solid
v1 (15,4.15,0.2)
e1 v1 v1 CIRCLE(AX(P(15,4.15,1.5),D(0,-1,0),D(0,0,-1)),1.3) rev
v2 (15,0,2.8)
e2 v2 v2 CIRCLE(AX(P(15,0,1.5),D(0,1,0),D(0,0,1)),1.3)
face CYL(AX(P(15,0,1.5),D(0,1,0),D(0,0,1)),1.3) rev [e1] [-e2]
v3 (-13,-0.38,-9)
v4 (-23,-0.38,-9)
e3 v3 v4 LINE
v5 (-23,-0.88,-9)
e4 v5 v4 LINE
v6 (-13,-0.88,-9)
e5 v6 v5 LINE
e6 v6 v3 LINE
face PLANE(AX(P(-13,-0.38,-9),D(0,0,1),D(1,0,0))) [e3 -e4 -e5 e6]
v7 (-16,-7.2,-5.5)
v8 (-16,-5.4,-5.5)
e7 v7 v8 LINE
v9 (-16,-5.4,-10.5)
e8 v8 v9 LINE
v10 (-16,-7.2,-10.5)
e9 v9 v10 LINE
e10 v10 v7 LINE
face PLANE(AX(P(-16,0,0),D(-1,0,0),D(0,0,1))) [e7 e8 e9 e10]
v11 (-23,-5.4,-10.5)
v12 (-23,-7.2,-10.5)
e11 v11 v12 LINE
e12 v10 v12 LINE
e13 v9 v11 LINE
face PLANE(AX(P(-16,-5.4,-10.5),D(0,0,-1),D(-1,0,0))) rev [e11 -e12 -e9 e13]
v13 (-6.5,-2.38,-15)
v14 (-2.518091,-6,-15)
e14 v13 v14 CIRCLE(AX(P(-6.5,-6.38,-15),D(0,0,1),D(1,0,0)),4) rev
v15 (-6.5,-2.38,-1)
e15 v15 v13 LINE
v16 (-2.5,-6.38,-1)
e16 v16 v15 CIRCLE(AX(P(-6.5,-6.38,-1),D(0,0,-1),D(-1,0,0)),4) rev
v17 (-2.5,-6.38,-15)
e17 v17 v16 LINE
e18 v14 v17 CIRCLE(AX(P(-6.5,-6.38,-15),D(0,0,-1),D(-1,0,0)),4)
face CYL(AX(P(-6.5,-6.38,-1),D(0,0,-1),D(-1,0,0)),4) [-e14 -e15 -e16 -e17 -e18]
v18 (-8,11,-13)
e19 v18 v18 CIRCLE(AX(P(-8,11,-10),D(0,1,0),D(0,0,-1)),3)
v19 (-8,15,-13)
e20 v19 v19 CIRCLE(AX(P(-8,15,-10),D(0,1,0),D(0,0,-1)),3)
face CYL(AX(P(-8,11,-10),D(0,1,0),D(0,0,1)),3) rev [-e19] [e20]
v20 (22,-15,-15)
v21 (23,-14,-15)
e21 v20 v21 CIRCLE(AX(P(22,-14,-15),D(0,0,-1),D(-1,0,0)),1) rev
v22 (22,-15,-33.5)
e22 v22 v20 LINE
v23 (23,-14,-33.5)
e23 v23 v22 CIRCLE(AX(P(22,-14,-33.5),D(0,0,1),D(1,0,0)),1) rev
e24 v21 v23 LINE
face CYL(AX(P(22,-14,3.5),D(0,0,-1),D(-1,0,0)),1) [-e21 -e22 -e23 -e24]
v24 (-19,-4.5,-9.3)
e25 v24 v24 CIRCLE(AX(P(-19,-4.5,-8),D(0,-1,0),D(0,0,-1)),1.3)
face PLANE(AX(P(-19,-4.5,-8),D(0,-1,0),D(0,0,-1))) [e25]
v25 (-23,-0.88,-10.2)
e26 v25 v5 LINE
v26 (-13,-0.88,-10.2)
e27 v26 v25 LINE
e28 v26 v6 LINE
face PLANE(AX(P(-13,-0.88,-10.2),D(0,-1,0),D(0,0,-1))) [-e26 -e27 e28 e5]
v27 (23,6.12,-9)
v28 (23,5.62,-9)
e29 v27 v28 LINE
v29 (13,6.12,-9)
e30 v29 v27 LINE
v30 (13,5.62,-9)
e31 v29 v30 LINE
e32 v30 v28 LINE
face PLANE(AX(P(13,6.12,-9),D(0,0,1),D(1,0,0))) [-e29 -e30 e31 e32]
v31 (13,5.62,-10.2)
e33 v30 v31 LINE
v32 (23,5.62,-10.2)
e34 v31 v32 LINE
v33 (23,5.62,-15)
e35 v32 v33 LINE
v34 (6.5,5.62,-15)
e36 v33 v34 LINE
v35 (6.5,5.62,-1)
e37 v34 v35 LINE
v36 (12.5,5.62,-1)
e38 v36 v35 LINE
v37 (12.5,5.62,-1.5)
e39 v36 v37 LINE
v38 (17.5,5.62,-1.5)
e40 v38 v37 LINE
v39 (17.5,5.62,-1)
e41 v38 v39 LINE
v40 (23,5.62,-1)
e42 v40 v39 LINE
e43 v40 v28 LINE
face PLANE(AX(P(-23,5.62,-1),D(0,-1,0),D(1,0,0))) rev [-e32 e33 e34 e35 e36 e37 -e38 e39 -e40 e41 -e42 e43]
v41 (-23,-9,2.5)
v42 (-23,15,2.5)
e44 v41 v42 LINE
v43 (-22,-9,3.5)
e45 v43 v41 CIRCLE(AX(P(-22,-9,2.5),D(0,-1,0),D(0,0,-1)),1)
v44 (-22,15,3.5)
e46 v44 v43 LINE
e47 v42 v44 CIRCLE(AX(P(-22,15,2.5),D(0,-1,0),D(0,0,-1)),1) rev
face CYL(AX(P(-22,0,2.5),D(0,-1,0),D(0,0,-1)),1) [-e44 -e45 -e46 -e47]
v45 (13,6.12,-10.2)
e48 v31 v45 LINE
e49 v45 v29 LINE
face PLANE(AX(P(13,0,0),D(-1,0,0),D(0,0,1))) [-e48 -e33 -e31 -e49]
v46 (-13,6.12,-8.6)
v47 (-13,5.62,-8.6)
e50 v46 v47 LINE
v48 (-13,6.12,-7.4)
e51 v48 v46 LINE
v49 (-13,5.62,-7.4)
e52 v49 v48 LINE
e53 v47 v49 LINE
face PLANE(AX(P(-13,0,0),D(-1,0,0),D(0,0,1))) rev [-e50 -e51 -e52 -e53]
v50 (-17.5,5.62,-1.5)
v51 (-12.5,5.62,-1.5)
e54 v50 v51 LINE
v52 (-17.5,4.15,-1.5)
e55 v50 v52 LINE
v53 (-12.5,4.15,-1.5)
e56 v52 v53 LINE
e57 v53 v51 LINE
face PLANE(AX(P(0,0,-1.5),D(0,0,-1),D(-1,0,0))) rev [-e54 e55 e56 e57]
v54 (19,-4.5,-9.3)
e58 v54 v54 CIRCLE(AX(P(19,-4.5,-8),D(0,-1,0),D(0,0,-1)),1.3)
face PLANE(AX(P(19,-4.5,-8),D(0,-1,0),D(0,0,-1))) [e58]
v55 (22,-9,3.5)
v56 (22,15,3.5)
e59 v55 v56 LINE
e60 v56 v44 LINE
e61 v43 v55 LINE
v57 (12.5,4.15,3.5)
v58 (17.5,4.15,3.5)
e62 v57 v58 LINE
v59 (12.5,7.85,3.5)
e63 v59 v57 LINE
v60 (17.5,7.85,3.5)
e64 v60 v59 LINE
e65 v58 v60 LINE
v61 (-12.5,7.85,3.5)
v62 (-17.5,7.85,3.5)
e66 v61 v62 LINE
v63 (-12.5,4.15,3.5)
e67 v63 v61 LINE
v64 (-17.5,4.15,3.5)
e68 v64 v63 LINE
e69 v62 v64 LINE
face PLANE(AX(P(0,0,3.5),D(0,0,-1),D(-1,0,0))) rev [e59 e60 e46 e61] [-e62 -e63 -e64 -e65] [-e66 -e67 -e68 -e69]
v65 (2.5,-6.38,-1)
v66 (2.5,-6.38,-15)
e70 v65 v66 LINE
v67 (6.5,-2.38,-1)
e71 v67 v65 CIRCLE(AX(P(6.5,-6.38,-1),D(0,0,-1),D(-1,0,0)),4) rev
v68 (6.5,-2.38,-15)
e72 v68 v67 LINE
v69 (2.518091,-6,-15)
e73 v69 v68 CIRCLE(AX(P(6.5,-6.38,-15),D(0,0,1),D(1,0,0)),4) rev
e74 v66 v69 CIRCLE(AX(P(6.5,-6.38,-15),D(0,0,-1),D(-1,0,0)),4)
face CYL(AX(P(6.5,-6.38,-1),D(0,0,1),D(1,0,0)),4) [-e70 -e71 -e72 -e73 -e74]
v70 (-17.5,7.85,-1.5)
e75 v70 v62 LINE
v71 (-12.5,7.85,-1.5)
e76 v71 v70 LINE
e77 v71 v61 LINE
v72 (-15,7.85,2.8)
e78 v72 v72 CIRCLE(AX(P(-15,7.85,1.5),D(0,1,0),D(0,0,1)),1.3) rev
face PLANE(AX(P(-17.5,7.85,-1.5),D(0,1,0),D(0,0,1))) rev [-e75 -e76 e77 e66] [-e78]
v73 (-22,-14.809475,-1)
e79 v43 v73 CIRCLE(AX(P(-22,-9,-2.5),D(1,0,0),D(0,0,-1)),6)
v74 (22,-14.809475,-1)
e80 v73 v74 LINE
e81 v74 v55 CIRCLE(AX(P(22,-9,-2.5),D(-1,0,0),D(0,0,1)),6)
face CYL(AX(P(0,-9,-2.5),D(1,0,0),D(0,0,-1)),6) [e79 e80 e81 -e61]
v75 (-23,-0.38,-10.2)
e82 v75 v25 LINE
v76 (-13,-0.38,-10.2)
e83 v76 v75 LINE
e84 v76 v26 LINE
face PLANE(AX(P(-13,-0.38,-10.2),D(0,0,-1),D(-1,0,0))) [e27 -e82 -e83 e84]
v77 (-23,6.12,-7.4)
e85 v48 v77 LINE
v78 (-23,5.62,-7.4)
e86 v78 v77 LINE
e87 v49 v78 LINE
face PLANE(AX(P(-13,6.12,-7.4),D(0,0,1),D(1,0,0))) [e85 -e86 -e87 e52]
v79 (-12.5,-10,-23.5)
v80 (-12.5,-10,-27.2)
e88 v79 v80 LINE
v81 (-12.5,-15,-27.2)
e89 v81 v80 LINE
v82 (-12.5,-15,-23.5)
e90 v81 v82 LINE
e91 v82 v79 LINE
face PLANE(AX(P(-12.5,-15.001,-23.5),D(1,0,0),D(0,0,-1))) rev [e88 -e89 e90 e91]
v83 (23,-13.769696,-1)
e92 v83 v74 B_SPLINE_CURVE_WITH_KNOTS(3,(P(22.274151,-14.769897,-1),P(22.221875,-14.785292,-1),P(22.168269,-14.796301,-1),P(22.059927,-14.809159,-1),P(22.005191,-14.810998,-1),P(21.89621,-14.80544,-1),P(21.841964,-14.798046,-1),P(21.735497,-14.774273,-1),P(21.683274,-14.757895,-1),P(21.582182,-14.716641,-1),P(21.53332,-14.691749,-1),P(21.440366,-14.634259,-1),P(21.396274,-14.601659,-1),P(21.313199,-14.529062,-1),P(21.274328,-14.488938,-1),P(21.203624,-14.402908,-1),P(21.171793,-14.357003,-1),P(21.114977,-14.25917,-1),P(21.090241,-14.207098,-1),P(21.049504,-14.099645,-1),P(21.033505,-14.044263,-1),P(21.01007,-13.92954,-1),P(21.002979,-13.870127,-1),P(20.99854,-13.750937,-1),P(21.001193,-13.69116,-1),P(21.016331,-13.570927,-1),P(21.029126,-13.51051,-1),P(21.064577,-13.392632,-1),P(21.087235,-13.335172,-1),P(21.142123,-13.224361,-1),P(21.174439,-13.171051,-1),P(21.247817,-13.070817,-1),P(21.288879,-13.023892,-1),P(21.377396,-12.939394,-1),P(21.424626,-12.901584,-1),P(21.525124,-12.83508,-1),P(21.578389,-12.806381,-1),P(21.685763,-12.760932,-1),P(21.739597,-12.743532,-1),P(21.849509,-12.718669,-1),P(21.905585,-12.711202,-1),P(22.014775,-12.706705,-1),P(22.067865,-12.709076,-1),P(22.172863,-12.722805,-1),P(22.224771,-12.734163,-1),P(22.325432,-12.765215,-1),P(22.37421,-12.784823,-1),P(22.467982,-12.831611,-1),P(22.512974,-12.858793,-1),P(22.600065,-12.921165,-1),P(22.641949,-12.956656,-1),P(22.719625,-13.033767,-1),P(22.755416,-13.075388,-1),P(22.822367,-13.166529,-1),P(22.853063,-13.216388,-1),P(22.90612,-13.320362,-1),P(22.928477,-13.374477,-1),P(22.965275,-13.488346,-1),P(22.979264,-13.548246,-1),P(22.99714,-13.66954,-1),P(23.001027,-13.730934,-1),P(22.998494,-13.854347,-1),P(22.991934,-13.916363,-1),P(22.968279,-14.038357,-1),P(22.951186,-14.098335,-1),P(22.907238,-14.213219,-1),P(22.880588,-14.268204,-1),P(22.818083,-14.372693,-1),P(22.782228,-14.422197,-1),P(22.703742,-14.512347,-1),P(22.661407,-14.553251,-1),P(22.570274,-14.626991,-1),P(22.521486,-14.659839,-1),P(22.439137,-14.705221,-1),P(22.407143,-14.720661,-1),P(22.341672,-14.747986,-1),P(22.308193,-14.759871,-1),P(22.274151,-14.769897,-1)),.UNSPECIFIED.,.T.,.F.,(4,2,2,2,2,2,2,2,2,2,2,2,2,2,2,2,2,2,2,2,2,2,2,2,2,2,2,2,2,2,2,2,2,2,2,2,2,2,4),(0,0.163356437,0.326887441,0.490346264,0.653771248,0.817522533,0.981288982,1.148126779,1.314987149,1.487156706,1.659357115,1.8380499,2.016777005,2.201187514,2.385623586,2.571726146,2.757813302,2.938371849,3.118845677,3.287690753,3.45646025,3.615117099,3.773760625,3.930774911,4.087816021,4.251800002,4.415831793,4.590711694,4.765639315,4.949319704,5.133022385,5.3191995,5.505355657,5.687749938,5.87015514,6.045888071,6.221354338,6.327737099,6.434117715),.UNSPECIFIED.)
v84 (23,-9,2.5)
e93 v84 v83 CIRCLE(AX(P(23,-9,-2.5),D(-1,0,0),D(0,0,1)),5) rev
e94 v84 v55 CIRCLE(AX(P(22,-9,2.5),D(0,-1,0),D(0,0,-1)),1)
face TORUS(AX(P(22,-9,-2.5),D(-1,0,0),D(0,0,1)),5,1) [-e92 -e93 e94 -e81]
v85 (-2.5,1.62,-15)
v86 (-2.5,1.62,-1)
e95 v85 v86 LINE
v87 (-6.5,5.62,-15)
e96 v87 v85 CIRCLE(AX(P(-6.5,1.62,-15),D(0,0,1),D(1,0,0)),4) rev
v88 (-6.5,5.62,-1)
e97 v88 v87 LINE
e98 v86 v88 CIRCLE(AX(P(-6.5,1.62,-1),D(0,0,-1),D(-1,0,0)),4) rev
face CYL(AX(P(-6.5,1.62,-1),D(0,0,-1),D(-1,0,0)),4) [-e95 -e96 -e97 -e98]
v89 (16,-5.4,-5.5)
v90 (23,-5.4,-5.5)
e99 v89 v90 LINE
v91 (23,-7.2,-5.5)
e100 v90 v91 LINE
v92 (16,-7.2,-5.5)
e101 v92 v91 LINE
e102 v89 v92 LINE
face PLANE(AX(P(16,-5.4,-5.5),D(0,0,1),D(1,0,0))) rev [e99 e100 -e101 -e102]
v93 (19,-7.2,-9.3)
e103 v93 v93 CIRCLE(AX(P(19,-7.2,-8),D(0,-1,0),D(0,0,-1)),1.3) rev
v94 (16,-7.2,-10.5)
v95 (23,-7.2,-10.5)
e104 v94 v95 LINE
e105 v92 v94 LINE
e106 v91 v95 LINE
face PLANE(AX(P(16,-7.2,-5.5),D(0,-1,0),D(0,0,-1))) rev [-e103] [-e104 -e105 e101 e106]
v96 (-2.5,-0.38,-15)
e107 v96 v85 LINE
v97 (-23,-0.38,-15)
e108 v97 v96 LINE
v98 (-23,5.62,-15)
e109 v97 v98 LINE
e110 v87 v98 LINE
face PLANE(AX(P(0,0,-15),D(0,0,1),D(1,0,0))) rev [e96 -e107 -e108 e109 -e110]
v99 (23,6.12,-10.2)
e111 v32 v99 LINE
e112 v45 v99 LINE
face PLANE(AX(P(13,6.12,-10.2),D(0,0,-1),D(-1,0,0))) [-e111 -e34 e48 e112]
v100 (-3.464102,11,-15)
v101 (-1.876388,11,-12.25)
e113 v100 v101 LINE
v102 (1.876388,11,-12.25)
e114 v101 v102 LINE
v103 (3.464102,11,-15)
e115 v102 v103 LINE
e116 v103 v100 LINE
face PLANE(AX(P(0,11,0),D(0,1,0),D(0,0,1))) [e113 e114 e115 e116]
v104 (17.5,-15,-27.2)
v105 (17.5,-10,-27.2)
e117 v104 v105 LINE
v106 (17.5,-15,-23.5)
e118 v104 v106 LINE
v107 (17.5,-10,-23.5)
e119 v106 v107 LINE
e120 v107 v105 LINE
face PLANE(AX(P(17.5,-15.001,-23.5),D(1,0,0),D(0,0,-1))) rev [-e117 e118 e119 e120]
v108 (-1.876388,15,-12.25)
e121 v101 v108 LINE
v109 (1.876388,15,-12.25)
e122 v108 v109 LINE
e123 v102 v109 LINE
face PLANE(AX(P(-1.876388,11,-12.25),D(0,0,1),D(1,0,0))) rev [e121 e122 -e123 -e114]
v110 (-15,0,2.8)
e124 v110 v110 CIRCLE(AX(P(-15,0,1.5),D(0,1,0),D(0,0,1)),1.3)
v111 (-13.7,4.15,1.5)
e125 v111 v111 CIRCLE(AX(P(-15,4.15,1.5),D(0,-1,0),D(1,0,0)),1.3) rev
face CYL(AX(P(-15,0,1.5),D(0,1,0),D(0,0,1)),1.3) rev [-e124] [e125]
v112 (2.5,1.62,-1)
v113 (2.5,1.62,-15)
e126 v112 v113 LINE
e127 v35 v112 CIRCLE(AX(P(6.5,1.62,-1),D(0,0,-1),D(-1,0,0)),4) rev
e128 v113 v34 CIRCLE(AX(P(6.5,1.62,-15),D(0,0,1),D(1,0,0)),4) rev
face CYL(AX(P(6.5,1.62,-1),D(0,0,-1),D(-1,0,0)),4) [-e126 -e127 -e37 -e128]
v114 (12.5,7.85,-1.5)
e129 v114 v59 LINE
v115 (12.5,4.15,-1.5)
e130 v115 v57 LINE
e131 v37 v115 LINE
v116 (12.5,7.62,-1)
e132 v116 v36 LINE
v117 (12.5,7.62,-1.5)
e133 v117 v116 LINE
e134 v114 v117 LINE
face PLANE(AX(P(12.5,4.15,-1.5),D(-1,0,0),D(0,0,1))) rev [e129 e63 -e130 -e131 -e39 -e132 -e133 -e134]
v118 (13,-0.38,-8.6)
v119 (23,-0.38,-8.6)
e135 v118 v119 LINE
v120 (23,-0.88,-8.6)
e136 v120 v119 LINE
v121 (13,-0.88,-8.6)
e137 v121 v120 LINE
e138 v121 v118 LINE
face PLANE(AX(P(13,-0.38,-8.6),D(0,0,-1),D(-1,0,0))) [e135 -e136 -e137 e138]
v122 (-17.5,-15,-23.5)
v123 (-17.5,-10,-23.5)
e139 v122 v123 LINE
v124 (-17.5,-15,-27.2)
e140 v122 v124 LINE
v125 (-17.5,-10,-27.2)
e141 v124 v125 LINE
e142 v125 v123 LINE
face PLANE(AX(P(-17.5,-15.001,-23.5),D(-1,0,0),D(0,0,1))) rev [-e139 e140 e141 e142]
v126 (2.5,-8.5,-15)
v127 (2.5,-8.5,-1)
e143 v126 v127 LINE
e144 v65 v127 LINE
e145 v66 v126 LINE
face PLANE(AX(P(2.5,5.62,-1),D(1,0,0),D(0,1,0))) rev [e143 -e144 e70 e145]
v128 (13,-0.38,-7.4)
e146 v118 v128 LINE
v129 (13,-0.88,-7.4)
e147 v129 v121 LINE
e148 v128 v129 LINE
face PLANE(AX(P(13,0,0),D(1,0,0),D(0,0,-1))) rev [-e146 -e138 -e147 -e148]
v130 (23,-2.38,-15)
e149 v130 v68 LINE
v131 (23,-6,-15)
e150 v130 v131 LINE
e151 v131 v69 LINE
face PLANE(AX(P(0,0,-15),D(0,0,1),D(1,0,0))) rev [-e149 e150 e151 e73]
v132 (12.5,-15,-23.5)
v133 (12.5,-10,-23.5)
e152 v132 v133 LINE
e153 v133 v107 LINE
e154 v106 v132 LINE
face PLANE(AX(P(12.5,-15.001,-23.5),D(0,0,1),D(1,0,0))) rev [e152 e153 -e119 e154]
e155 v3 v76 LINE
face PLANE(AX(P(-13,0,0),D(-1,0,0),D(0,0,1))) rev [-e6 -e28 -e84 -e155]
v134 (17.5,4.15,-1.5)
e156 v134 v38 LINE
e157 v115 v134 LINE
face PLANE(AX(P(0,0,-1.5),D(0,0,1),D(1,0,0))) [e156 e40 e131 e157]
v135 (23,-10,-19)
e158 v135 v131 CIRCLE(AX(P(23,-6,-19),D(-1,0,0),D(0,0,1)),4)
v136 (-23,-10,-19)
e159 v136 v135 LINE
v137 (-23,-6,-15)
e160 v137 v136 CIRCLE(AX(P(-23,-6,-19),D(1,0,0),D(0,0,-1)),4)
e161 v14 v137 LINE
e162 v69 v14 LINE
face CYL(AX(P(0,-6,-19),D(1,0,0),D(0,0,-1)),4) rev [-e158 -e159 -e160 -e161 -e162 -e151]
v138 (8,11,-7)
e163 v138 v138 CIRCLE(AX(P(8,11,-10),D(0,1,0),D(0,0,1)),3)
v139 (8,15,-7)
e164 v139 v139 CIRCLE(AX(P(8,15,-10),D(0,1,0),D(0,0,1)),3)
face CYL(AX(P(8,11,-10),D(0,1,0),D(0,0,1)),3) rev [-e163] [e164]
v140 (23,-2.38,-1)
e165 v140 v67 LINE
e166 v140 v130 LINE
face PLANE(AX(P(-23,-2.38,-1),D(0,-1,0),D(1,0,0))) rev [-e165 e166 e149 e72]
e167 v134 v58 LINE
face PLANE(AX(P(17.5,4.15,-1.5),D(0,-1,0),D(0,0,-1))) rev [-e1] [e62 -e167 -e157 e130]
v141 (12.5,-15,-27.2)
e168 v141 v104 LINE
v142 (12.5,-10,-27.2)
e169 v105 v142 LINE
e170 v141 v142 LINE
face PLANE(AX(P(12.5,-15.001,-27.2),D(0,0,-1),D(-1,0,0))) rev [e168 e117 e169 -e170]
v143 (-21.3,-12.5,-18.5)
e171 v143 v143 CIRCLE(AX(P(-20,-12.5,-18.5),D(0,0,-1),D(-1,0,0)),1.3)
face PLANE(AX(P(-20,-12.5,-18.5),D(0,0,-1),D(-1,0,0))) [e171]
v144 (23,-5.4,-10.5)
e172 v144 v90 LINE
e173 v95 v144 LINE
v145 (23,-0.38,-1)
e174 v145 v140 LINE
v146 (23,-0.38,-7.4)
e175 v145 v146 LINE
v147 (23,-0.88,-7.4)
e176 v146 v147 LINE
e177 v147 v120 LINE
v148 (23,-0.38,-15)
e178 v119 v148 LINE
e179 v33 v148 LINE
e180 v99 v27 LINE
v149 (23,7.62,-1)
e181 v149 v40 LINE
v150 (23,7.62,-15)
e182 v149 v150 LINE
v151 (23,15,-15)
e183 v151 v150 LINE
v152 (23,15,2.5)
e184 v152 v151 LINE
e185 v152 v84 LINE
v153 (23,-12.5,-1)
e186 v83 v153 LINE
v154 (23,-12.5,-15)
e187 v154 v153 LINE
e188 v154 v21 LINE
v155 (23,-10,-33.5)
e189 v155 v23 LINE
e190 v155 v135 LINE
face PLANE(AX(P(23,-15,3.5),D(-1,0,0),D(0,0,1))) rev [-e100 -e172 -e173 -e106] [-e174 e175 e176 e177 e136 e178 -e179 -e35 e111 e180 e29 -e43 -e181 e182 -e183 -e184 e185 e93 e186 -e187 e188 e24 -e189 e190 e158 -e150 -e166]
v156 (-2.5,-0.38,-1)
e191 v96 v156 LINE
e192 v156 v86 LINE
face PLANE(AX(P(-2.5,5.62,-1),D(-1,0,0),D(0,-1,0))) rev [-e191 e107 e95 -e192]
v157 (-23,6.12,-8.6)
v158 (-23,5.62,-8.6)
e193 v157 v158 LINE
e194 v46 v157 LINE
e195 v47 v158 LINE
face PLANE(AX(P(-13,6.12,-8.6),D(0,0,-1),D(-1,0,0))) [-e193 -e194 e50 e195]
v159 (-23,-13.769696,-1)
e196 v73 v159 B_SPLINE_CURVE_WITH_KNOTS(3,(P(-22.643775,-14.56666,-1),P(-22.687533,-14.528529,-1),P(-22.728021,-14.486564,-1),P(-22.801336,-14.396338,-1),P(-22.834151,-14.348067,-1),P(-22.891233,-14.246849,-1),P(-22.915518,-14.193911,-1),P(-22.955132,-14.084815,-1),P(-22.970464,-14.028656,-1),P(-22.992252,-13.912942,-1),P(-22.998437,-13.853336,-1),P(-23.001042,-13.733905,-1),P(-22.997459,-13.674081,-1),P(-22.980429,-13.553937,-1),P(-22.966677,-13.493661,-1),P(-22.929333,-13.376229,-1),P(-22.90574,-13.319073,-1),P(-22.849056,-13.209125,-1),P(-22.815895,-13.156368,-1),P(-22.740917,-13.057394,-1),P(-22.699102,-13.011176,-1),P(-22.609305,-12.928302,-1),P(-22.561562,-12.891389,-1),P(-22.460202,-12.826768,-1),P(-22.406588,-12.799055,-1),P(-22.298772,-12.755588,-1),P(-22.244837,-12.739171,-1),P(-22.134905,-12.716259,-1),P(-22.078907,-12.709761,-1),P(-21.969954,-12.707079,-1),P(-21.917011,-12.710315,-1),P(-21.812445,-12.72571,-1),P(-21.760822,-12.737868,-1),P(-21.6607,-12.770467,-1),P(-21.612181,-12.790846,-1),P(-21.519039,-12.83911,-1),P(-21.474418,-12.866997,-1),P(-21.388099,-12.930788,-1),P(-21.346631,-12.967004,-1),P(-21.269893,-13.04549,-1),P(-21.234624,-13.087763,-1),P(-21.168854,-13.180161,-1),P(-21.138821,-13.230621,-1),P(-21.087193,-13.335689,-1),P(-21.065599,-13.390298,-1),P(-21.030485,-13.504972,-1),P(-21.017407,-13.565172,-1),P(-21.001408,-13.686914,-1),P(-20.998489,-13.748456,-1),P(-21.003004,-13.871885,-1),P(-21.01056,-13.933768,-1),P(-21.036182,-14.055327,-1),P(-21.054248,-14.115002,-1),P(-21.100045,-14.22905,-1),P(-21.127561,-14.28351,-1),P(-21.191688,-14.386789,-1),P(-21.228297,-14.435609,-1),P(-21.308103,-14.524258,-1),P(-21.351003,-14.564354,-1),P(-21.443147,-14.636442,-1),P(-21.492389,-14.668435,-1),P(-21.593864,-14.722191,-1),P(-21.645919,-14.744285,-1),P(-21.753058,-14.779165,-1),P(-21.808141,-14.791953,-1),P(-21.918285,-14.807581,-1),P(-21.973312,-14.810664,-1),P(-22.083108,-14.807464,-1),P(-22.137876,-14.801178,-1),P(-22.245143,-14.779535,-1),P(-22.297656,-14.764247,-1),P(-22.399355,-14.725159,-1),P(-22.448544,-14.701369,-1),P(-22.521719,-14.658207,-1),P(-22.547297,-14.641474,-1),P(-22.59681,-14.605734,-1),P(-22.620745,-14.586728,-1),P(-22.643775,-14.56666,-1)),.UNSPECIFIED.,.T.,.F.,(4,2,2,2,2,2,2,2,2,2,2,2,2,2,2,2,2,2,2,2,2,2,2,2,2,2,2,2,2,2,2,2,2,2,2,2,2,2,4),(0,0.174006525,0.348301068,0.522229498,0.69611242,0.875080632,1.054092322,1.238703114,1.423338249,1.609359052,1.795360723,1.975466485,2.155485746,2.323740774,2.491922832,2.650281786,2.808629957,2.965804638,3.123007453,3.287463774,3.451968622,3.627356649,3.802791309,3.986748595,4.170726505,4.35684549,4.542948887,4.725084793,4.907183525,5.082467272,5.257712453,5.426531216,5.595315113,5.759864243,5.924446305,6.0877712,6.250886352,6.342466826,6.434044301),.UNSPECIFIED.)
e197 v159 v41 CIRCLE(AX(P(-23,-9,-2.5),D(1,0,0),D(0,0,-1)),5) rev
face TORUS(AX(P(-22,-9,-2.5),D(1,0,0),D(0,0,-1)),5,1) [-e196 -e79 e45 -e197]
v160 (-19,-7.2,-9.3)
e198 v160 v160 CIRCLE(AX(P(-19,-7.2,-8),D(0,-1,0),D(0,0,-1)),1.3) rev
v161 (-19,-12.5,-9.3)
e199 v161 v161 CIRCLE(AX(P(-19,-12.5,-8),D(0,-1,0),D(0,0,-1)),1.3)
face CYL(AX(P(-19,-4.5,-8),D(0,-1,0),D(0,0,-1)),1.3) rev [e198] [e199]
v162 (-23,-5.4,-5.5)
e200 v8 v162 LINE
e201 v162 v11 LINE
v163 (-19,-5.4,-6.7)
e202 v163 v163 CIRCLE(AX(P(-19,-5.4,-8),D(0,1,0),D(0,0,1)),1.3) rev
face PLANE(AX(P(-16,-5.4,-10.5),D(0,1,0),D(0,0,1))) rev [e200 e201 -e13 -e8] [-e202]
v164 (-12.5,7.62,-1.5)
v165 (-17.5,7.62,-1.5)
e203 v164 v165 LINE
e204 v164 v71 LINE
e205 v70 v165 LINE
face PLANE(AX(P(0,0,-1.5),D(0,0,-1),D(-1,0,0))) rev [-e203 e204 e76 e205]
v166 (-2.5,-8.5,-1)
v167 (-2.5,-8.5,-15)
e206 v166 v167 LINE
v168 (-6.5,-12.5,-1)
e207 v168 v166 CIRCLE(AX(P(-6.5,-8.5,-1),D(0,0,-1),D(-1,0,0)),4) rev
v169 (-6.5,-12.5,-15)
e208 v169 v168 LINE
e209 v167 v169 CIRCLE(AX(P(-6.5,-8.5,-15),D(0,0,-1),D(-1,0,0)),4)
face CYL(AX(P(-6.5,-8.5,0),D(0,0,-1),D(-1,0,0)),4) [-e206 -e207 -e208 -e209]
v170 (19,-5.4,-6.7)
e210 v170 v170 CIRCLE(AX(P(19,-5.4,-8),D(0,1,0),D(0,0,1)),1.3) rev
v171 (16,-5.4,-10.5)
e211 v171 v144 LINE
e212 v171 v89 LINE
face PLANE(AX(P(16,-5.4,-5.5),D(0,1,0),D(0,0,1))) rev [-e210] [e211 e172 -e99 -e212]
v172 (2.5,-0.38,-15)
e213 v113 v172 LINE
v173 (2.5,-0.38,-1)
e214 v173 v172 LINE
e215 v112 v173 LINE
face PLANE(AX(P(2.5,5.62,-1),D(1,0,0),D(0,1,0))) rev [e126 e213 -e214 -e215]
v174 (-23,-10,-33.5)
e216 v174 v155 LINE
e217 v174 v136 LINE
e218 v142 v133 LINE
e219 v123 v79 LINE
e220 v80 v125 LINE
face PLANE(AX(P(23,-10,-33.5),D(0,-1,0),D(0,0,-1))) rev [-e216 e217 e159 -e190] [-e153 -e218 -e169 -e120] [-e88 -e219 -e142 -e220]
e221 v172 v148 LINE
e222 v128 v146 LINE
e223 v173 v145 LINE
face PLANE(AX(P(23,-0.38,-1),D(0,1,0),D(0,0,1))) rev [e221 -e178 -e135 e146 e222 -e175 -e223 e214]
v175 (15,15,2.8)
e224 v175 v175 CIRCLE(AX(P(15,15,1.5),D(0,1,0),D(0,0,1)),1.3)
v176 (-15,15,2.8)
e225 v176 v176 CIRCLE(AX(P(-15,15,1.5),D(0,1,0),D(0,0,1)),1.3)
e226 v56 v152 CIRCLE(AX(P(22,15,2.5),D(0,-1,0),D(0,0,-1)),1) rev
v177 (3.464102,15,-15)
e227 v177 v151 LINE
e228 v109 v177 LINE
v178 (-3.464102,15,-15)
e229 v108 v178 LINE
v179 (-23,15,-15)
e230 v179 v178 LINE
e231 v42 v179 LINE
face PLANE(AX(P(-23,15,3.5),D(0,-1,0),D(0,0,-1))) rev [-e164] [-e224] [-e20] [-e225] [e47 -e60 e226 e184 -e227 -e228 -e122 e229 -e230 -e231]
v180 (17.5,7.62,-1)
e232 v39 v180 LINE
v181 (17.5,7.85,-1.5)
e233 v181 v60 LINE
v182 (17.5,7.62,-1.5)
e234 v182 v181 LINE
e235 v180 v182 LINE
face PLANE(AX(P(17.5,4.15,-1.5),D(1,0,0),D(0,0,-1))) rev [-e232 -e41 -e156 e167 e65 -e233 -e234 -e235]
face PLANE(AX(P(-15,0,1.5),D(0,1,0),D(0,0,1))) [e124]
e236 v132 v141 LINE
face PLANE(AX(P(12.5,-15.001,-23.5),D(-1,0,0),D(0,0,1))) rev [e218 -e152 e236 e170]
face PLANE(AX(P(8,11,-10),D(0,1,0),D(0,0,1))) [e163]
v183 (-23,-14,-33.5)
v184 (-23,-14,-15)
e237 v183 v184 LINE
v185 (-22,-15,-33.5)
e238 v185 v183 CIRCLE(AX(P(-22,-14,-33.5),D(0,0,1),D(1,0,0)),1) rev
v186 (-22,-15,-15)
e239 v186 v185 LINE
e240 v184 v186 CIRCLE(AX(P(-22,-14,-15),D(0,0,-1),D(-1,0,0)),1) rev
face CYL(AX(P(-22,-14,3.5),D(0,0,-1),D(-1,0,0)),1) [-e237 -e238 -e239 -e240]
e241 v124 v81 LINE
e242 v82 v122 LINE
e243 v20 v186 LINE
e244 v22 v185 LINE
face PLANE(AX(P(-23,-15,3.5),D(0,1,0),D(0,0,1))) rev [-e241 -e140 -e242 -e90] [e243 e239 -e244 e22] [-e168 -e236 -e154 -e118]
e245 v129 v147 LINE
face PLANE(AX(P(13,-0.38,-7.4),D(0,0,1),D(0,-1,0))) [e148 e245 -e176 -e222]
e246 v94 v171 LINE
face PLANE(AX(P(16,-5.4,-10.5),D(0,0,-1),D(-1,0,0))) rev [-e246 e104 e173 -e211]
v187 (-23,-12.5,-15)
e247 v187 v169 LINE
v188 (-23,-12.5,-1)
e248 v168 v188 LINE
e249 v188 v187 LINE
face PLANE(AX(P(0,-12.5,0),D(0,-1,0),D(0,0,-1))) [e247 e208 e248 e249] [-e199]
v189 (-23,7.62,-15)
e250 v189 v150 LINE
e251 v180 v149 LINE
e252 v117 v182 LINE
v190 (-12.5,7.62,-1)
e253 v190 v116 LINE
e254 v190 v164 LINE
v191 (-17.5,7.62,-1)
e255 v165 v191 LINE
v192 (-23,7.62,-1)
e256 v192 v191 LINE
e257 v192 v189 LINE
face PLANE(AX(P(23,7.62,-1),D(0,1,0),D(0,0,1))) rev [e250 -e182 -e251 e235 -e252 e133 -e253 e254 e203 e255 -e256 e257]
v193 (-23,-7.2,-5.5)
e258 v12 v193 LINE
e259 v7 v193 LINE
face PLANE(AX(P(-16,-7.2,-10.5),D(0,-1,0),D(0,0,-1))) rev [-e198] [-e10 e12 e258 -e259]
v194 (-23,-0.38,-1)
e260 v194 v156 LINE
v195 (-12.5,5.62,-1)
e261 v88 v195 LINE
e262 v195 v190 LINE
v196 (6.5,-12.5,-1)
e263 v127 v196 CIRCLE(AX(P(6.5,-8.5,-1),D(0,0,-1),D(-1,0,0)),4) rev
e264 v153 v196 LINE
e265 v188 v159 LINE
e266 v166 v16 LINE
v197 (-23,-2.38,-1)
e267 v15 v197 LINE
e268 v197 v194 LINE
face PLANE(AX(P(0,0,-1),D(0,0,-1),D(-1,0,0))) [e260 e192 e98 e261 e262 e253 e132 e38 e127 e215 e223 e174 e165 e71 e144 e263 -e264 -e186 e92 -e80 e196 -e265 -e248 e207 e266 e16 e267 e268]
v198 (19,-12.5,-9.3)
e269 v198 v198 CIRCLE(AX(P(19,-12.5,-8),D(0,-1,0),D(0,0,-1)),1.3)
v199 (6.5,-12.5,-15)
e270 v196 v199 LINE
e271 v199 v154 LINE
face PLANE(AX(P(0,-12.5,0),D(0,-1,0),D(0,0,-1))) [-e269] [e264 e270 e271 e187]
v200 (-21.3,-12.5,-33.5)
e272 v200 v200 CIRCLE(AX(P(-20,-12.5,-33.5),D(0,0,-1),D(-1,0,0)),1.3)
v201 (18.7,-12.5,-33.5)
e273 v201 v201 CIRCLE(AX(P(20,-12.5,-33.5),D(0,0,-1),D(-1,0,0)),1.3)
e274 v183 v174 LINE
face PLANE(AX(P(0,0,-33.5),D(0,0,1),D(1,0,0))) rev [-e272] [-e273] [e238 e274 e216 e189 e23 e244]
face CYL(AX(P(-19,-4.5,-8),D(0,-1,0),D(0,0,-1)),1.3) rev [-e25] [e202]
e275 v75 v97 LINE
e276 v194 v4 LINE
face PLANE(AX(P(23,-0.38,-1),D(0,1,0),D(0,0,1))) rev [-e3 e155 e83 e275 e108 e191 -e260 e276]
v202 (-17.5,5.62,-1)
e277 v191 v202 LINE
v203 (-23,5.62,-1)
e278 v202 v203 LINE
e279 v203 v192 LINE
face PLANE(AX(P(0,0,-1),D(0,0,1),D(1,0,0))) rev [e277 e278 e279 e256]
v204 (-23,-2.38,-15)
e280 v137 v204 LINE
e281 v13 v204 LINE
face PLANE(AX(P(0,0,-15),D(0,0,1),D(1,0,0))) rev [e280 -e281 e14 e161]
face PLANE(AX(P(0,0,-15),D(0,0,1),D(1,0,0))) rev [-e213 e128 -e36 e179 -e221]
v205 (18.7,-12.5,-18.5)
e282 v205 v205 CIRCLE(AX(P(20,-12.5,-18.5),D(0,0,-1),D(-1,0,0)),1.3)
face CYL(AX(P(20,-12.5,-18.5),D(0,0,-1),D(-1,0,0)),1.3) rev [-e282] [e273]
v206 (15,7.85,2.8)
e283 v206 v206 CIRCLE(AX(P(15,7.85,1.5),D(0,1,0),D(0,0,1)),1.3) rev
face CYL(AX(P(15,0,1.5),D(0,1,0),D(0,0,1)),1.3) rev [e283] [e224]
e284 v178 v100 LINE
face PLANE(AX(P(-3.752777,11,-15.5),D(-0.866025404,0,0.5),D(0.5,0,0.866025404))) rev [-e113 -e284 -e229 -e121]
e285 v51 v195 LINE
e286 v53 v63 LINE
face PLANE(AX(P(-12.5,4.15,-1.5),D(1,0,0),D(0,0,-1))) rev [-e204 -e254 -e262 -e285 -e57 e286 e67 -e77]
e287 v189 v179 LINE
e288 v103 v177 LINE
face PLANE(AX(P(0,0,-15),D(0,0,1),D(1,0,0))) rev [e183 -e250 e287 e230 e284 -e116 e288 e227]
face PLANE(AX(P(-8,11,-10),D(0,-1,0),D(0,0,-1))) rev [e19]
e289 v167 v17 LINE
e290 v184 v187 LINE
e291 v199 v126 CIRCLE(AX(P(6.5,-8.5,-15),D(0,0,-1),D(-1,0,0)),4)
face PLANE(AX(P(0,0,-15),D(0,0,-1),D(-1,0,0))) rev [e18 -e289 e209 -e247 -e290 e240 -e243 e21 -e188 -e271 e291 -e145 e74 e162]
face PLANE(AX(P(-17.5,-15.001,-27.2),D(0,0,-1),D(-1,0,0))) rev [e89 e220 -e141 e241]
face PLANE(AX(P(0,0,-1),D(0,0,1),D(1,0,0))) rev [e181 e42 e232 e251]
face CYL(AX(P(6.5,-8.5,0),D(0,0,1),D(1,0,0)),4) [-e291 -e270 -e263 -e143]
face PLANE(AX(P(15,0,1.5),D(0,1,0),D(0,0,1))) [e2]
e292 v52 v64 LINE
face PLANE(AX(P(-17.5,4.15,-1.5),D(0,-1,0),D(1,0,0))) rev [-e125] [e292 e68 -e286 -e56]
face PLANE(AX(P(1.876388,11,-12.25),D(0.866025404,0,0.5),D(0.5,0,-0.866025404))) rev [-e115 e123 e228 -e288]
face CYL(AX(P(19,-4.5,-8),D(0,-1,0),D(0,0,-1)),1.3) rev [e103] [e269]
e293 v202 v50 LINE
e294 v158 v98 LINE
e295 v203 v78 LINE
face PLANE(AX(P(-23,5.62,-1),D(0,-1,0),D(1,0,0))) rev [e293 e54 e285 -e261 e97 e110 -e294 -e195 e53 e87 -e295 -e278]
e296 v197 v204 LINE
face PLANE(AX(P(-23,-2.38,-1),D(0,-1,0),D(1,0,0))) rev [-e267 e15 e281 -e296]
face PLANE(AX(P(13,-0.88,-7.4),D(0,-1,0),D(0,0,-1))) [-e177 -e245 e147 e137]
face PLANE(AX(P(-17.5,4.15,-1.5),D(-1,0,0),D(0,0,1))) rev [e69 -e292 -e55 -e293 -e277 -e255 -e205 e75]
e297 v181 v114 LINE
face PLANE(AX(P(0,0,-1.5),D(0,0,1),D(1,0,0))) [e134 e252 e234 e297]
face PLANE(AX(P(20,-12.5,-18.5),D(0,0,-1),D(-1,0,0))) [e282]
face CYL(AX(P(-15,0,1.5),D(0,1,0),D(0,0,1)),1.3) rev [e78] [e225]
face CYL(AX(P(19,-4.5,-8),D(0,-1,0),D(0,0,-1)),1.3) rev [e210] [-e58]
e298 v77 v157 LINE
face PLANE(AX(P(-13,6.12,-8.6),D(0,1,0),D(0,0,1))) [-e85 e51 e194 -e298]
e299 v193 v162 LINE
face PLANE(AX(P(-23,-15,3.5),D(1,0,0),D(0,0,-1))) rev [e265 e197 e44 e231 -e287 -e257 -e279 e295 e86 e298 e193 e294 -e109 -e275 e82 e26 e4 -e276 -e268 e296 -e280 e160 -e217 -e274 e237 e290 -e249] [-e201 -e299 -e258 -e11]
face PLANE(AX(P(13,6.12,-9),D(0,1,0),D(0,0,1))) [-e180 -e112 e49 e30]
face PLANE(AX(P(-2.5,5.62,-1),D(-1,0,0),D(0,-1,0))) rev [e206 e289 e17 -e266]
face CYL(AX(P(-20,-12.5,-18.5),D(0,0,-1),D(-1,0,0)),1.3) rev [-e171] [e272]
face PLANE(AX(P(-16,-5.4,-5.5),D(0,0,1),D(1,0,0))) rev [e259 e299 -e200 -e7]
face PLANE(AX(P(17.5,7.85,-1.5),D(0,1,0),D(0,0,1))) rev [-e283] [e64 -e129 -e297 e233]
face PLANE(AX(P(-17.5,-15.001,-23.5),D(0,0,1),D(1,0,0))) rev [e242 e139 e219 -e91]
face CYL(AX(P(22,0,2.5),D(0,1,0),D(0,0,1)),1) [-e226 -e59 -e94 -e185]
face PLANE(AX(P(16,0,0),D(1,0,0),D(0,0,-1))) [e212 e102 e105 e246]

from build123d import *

# Parameters (mm, degrees)
SKETCH_1_W           = 46
SKETCH_1_H           = 30
EXTRUDE_1_DEPTH      = 3.5
SKETCH_2_W           = 46
SKETCH_2_H           = 5
EXTRUDE_2_DEPTH      = 33.5
SKETCH_4_R           = 1.3
CUT_EXTRUDE_2_DEPTH  = 15
SKETCH_5_R           = 1.3
CUT_EXTRUDE_3_DEPTH  = 15
CUT_EXTRUDE_4_REACH  = 49.71
SKETCH_6_W           = 5
SKETCH_6_H           = 3.7
SKETCH_7_W           = 46
SKETCH_7_H           = 25
EXTRUDE_3_DEPTH      = 15
SKETCH_8_W           = 46
SKETCH_8_H           = 2
CUT_EXTRUDE_5_DEPTH  = 14
SKETCH_10_W          = 5
SKETCH_10_H          = 3.7
CUT_EXTRUDE_7_DEPTH  = 5
FILLET_1_R           = 6
FILLET_2_R           = 4
SKETCH_11_W          = 5
SKETCH_11_H          = 23.135705429
CUT_EXTRUDE_8_DEPTH  = 14
FILLET_3_R           = 4
FILLET_4_R           = 1
SKETCH_12_W          = 1.2
SKETCH_12_H          = 0.5
EXTRUDE_4_DEPTH      = 10
SKETCH_13_W          = 1.2
SKETCH_13_H          = 0.5
EXTRUDE_5_DEPTH      = 10
SKETCH_14_W          = 57.080352076
SKETCH_14_H          = 14
CUT_EXTRUDE_9_DEPTH  = 2.5
FILLET_5_R           = 4
SKETCH_15_R          = 1.3
CUT_EXTRUDE_10_DEPTH = 8
SKETCH_16_W          = 5
SKETCH_16_H          = 1.8
CUT_EXTRUDE_11_DEPTH = 7
SKETCH_17_W          = 5
SKETCH_17_H          = 1.8
CUT_EXTRUDE_12_DEPTH = 7
SKETCH_18_R          = 3
CUT_EXTRUDE_13_DEPTH = 4


with BuildPart() as part:
    # Эскиз1 → Бобышка-Вытянуть1 (new body)
    with BuildSketch(Plane.XY):
        Rectangle(SKETCH_1_W, SKETCH_1_H)
    extrude(amount=EXTRUDE_1_DEPTH)

    # Эскиз2 → Бобышка-Вытянуть2 (add)
    with BuildSketch(Plane(origin=(0, 0, 0), x_dir=(-1, 0, 0), z_dir=(0, 0, -1))):
        with Locations((0, -12.5)):
            Rectangle(SKETCH_2_W, SKETCH_2_H)
    extrude(amount=EXTRUDE_2_DEPTH)

    # Эскиз4 → Вырез-Вытянуть2 (cut)
    with BuildSketch(Plane(origin=(0, 15, 0), x_dir=(1, 0, 0), z_dir=(0, 1, 0))):
        with Locations(Location((15, -1.5, 0), (0, 0, 270))):
            Circle(SKETCH_4_R)
        with Locations(Location((-15, -1.5, 0), (0, 0, 270))):
            Circle(SKETCH_4_R)
    extrude(amount=-CUT_EXTRUDE_2_DEPTH, mode=Mode.SUBTRACT)

    # Эскиз5 → Вырез-Вытянуть3 (cut)
    with BuildSketch(Plane(origin=(0, 0, -33.5), x_dir=(-1, 0, 0), z_dir=(0, 0, -1))):
        with Locations((-20, -12.5)):
            Circle(SKETCH_5_R)
        with Locations((20, -12.5)):
            Circle(SKETCH_5_R)
    extrude(amount=-CUT_EXTRUDE_3_DEPTH, mode=Mode.SUBTRACT)

    # Эскиз6 → Вырез-Вытянуть4 (cut, up to next)
    with BuildSketch(Plane(origin=(0, -10, 0), x_dir=(1, 0, 0), z_dir=(0, 1, 0)), mode=Mode.PRIVATE) as cut_extrude_4_sk1:
        with Locations((-15, 25.35)):
            Rectangle(SKETCH_6_W, SKETCH_6_H)
    cut_extrude_4_tool1 = extrude(cut_extrude_4_sk1.sketch, amount=-CUT_EXTRUDE_4_REACH, mode=Mode.PRIVATE) & part.part
    # Эскиз6 → Вырез-Вытянуть4 (cut, up to next)
    with BuildSketch(Plane(origin=(0, -10, 0), x_dir=(1, 0, 0), z_dir=(0, 1, 0)), mode=Mode.PRIVATE) as cut_extrude_4_sk2:
        with Locations((15, 25.35)):
            Rectangle(SKETCH_6_W, SKETCH_6_H)
    cut_extrude_4_tool2 = extrude(cut_extrude_4_sk2.sketch, amount=-CUT_EXTRUDE_4_REACH, mode=Mode.PRIVATE) & part.part
    add(cut_extrude_4_tool1.solids().sort_by_distance((-15, -10, -25.35))[0], mode=Mode.SUBTRACT)
    add(cut_extrude_4_tool2.solids().sort_by_distance((15, -10, -25.35))[0], mode=Mode.SUBTRACT)

    # Эскиз7 → Бобышка-Вытянуть3 (add)
    with BuildSketch(Plane(origin=(0, 0, 0), x_dir=(-1, 0, 0), z_dir=(0, 0, -1))):
        with Locations((0, 2.5)):
            Rectangle(SKETCH_7_W, SKETCH_7_H)
    extrude(amount=EXTRUDE_3_DEPTH)

    # Эскиз8 → Вырез-Вытянуть5 (cut)
    with BuildSketch(Plane(origin=(0, 0, -15), x_dir=(-1, 0, 0), z_dir=(0, 0, -1))):
        with Locations((0, 6.62)):
            Rectangle(SKETCH_8_W, SKETCH_8_H)
        with Locations((0, -1.38)):
            Rectangle(SKETCH_8_W, SKETCH_8_H)
    extrude(amount=-CUT_EXTRUDE_5_DEPTH, mode=Mode.SUBTRACT)

    # Эскиз10 → Вырез-Вытянуть7 (cut)
    with BuildSketch(Plane.XY.offset(3.5)):
        with Locations((15, 6)):
            Rectangle(SKETCH_10_W, SKETCH_10_H)
        with Locations((-15, 6)):
            Rectangle(SKETCH_10_W, SKETCH_10_H)
    extrude(amount=-CUT_EXTRUDE_7_DEPTH, mode=Mode.SUBTRACT)

    # Скругление1
    fillet_1_edges = [part.edges().sort_by_distance(p)[0] for p in [
        (0, -15, 3.5),
    ]]
    fillet(fillet_1_edges, radius=FILLET_1_R)

    # Скругление2
    fillet_2_edges = [part.edges().sort_by_distance(p)[0] for p in [
        (0, -10, -15),
    ]]
    fillet(fillet_2_edges, radius=FILLET_2_R)

    # Эскиз11 → Вырез-Вытянуть8 (cut)
    with BuildSketch(Plane(origin=(0, 0, -15), x_dir=(-1, 0, 0), z_dir=(0, 0, -1))):
        with Locations((0, -5.947852714)):
            Rectangle(SKETCH_11_W, SKETCH_11_H)
    extrude(amount=-CUT_EXTRUDE_8_DEPTH, mode=Mode.SUBTRACT)

    # Скругление3
    # the kernel refuses this fillet: 4 mm, written as the material it takes off along each edge
    with BuildSketch(Plane(origin=(-2.5, 5.62, -25), x_dir=(-1, 0, 0), z_dir=(0, 0, 1))) as fillet_3_piece_1:
        with BuildLine():
            CenterArc((FILLET_3_R, FILLET_3_R), FILLET_3_R, 180, 90)
            Line((0, FILLET_3_R), (0, 0))
            Line((0, 0), (FILLET_3_R, 0))
        make_face()
    extrude(amount=24, mode=Mode.SUBTRACT)
    with BuildSketch(Plane(origin=(-2.5, -2.38, -1), x_dir=(-1, 0, 0), z_dir=(0, 0, -1))) as fillet_3_piece_2:
        with BuildLine():
            CenterArc((FILLET_3_R, -FILLET_3_R), FILLET_3_R, 90, 90)
            Line((0, -FILLET_3_R), (0, 0))
            Line((0, 0), (FILLET_3_R, 0))
        make_face()
    extrude(amount=14, mode=Mode.SUBTRACT)
    with BuildSketch(Plane(origin=(2.5, -2.38, -15), x_dir=(0, -1, 0), z_dir=(0, 0, 1))) as fillet_3_piece_3:
        with BuildLine():
            CenterArc((FILLET_3_R, FILLET_3_R), FILLET_3_R, 180, 90)
            Line((0, FILLET_3_R), (0, 0))
            Line((0, 0), (FILLET_3_R, 0))
        make_face()
    extrude(amount=14, mode=Mode.SUBTRACT)
    with BuildSketch(Plane(origin=(2.5, 5.62, -25), x_dir=(1, 0, 0), z_dir=(0, 0, 1))) as fillet_3_piece_4:
        with BuildLine():
            CenterArc((FILLET_3_R, -FILLET_3_R), FILLET_3_R, 90, 90)
            Line((0, -FILLET_3_R), (0, 0))
            Line((0, 0), (FILLET_3_R, 0))
        make_face()
    extrude(amount=24, mode=Mode.SUBTRACT)

    # Скругление4
    fillet_4_edges = [part.edges().sort_by_distance(p)[0] for p in [
        (-23, 3, 3.5),
        (23, 3, 3.5),
        (23, -15, -18),
        (23, -13.242640687, 1.742640687),
        (-23, -15, -18),
        (-23, -13.242640687, 1.742640687),
    ]]
    fillet(fillet_4_edges, radius=FILLET_4_R)

    # Эскиз12 → Бобышка-Вытянуть4 (add)
    with BuildSketch(Plane(origin=(23, 0, 0), x_dir=(0, 0, -1), z_dir=(1, 0, 0))):
        with Locations((9.6, 5.87)):
            Rectangle(SKETCH_12_W, SKETCH_12_H)
        with Locations((8, -0.63)):
            Rectangle(SKETCH_12_W, SKETCH_12_H)
    extrude(amount=-EXTRUDE_4_DEPTH)

    # Эскиз13 → Бобышка-Вытянуть5 (add)
    with BuildSketch(Plane.ZY.offset(23)):
        with Locations((-8, 5.87)):
            Rectangle(SKETCH_13_W, SKETCH_13_H)
        with Locations((-9.6, -0.63)):
            Rectangle(SKETCH_13_W, SKETCH_13_H)
    extrude(amount=-EXTRUDE_5_DEPTH)

    # Эскиз14 → Вырез-Вытянуть9 (cut)
    with BuildSketch(Plane.XZ.offset(15)):
        with Locations((0, -8)):
            Rectangle(SKETCH_14_W, SKETCH_14_H)
    extrude(amount=-CUT_EXTRUDE_9_DEPTH, mode=Mode.SUBTRACT)

    # Скругление5
    fillet_5_edges = [part.edges().sort_by_distance(p)[0] for p in [
        (-2.5, -12.5, -8),
        (2.5, -12.5, -8),
    ]]
    fillet(fillet_5_edges, radius=FILLET_5_R)

    # Эскиз15 → Вырез-Вытянуть10 (cut)
    with BuildSketch(Plane.XZ.offset(12.5)):
        with Locations(Location((-19, -8, 0), (0, 0, 270))):
            Circle(SKETCH_15_R)
        with Locations(Location((19, -8, 0), (0, 0, 270))):
            Circle(SKETCH_15_R)
    extrude(amount=-CUT_EXTRUDE_10_DEPTH, mode=Mode.SUBTRACT)

    # Эскиз16 → Вырез-Вытянуть11 (cut)
    with BuildSketch(Plane.ZY.offset(23)):
        with Locations((-8, -6.3)):
            Rectangle(SKETCH_16_W, SKETCH_16_H)
    extrude(amount=-CUT_EXTRUDE_11_DEPTH, mode=Mode.SUBTRACT)

    # Эскиз17 → Вырез-Вытянуть12 (cut)
    with BuildSketch(Plane(origin=(23, 0, 0), x_dir=(0, 0, -1), z_dir=(1, 0, 0))):
        with Locations((8, -6.3)):
            Rectangle(SKETCH_17_W, SKETCH_17_H)
    extrude(amount=-CUT_EXTRUDE_12_DEPTH, mode=Mode.SUBTRACT)

    # Эскиз18 → Вырез-Вытянуть13 (cut)
    with BuildSketch(Plane(origin=(0, 15, 0), x_dir=(1, 0, 0), z_dir=(0, 1, 0))):
        with Locations(Location((8, 10, 0), (0, 0, 270))):
            Circle(SKETCH_18_R)
        with Locations(Location((-8, 10, 0), (0, 0, 90))):
            Circle(SKETCH_18_R)
        Polygon((3.75277675, 15.5), (1.876388375, 18.75), (-1.876388375, 18.75), (-3.75277675, 15.5), (-1.876388375, 12.25), (1.876388375, 12.25), align=None)
    extrude(amount=-CUT_EXTRUDE_13_DEPTH, mode=Mode.SUBTRACT)


solid = part.part
